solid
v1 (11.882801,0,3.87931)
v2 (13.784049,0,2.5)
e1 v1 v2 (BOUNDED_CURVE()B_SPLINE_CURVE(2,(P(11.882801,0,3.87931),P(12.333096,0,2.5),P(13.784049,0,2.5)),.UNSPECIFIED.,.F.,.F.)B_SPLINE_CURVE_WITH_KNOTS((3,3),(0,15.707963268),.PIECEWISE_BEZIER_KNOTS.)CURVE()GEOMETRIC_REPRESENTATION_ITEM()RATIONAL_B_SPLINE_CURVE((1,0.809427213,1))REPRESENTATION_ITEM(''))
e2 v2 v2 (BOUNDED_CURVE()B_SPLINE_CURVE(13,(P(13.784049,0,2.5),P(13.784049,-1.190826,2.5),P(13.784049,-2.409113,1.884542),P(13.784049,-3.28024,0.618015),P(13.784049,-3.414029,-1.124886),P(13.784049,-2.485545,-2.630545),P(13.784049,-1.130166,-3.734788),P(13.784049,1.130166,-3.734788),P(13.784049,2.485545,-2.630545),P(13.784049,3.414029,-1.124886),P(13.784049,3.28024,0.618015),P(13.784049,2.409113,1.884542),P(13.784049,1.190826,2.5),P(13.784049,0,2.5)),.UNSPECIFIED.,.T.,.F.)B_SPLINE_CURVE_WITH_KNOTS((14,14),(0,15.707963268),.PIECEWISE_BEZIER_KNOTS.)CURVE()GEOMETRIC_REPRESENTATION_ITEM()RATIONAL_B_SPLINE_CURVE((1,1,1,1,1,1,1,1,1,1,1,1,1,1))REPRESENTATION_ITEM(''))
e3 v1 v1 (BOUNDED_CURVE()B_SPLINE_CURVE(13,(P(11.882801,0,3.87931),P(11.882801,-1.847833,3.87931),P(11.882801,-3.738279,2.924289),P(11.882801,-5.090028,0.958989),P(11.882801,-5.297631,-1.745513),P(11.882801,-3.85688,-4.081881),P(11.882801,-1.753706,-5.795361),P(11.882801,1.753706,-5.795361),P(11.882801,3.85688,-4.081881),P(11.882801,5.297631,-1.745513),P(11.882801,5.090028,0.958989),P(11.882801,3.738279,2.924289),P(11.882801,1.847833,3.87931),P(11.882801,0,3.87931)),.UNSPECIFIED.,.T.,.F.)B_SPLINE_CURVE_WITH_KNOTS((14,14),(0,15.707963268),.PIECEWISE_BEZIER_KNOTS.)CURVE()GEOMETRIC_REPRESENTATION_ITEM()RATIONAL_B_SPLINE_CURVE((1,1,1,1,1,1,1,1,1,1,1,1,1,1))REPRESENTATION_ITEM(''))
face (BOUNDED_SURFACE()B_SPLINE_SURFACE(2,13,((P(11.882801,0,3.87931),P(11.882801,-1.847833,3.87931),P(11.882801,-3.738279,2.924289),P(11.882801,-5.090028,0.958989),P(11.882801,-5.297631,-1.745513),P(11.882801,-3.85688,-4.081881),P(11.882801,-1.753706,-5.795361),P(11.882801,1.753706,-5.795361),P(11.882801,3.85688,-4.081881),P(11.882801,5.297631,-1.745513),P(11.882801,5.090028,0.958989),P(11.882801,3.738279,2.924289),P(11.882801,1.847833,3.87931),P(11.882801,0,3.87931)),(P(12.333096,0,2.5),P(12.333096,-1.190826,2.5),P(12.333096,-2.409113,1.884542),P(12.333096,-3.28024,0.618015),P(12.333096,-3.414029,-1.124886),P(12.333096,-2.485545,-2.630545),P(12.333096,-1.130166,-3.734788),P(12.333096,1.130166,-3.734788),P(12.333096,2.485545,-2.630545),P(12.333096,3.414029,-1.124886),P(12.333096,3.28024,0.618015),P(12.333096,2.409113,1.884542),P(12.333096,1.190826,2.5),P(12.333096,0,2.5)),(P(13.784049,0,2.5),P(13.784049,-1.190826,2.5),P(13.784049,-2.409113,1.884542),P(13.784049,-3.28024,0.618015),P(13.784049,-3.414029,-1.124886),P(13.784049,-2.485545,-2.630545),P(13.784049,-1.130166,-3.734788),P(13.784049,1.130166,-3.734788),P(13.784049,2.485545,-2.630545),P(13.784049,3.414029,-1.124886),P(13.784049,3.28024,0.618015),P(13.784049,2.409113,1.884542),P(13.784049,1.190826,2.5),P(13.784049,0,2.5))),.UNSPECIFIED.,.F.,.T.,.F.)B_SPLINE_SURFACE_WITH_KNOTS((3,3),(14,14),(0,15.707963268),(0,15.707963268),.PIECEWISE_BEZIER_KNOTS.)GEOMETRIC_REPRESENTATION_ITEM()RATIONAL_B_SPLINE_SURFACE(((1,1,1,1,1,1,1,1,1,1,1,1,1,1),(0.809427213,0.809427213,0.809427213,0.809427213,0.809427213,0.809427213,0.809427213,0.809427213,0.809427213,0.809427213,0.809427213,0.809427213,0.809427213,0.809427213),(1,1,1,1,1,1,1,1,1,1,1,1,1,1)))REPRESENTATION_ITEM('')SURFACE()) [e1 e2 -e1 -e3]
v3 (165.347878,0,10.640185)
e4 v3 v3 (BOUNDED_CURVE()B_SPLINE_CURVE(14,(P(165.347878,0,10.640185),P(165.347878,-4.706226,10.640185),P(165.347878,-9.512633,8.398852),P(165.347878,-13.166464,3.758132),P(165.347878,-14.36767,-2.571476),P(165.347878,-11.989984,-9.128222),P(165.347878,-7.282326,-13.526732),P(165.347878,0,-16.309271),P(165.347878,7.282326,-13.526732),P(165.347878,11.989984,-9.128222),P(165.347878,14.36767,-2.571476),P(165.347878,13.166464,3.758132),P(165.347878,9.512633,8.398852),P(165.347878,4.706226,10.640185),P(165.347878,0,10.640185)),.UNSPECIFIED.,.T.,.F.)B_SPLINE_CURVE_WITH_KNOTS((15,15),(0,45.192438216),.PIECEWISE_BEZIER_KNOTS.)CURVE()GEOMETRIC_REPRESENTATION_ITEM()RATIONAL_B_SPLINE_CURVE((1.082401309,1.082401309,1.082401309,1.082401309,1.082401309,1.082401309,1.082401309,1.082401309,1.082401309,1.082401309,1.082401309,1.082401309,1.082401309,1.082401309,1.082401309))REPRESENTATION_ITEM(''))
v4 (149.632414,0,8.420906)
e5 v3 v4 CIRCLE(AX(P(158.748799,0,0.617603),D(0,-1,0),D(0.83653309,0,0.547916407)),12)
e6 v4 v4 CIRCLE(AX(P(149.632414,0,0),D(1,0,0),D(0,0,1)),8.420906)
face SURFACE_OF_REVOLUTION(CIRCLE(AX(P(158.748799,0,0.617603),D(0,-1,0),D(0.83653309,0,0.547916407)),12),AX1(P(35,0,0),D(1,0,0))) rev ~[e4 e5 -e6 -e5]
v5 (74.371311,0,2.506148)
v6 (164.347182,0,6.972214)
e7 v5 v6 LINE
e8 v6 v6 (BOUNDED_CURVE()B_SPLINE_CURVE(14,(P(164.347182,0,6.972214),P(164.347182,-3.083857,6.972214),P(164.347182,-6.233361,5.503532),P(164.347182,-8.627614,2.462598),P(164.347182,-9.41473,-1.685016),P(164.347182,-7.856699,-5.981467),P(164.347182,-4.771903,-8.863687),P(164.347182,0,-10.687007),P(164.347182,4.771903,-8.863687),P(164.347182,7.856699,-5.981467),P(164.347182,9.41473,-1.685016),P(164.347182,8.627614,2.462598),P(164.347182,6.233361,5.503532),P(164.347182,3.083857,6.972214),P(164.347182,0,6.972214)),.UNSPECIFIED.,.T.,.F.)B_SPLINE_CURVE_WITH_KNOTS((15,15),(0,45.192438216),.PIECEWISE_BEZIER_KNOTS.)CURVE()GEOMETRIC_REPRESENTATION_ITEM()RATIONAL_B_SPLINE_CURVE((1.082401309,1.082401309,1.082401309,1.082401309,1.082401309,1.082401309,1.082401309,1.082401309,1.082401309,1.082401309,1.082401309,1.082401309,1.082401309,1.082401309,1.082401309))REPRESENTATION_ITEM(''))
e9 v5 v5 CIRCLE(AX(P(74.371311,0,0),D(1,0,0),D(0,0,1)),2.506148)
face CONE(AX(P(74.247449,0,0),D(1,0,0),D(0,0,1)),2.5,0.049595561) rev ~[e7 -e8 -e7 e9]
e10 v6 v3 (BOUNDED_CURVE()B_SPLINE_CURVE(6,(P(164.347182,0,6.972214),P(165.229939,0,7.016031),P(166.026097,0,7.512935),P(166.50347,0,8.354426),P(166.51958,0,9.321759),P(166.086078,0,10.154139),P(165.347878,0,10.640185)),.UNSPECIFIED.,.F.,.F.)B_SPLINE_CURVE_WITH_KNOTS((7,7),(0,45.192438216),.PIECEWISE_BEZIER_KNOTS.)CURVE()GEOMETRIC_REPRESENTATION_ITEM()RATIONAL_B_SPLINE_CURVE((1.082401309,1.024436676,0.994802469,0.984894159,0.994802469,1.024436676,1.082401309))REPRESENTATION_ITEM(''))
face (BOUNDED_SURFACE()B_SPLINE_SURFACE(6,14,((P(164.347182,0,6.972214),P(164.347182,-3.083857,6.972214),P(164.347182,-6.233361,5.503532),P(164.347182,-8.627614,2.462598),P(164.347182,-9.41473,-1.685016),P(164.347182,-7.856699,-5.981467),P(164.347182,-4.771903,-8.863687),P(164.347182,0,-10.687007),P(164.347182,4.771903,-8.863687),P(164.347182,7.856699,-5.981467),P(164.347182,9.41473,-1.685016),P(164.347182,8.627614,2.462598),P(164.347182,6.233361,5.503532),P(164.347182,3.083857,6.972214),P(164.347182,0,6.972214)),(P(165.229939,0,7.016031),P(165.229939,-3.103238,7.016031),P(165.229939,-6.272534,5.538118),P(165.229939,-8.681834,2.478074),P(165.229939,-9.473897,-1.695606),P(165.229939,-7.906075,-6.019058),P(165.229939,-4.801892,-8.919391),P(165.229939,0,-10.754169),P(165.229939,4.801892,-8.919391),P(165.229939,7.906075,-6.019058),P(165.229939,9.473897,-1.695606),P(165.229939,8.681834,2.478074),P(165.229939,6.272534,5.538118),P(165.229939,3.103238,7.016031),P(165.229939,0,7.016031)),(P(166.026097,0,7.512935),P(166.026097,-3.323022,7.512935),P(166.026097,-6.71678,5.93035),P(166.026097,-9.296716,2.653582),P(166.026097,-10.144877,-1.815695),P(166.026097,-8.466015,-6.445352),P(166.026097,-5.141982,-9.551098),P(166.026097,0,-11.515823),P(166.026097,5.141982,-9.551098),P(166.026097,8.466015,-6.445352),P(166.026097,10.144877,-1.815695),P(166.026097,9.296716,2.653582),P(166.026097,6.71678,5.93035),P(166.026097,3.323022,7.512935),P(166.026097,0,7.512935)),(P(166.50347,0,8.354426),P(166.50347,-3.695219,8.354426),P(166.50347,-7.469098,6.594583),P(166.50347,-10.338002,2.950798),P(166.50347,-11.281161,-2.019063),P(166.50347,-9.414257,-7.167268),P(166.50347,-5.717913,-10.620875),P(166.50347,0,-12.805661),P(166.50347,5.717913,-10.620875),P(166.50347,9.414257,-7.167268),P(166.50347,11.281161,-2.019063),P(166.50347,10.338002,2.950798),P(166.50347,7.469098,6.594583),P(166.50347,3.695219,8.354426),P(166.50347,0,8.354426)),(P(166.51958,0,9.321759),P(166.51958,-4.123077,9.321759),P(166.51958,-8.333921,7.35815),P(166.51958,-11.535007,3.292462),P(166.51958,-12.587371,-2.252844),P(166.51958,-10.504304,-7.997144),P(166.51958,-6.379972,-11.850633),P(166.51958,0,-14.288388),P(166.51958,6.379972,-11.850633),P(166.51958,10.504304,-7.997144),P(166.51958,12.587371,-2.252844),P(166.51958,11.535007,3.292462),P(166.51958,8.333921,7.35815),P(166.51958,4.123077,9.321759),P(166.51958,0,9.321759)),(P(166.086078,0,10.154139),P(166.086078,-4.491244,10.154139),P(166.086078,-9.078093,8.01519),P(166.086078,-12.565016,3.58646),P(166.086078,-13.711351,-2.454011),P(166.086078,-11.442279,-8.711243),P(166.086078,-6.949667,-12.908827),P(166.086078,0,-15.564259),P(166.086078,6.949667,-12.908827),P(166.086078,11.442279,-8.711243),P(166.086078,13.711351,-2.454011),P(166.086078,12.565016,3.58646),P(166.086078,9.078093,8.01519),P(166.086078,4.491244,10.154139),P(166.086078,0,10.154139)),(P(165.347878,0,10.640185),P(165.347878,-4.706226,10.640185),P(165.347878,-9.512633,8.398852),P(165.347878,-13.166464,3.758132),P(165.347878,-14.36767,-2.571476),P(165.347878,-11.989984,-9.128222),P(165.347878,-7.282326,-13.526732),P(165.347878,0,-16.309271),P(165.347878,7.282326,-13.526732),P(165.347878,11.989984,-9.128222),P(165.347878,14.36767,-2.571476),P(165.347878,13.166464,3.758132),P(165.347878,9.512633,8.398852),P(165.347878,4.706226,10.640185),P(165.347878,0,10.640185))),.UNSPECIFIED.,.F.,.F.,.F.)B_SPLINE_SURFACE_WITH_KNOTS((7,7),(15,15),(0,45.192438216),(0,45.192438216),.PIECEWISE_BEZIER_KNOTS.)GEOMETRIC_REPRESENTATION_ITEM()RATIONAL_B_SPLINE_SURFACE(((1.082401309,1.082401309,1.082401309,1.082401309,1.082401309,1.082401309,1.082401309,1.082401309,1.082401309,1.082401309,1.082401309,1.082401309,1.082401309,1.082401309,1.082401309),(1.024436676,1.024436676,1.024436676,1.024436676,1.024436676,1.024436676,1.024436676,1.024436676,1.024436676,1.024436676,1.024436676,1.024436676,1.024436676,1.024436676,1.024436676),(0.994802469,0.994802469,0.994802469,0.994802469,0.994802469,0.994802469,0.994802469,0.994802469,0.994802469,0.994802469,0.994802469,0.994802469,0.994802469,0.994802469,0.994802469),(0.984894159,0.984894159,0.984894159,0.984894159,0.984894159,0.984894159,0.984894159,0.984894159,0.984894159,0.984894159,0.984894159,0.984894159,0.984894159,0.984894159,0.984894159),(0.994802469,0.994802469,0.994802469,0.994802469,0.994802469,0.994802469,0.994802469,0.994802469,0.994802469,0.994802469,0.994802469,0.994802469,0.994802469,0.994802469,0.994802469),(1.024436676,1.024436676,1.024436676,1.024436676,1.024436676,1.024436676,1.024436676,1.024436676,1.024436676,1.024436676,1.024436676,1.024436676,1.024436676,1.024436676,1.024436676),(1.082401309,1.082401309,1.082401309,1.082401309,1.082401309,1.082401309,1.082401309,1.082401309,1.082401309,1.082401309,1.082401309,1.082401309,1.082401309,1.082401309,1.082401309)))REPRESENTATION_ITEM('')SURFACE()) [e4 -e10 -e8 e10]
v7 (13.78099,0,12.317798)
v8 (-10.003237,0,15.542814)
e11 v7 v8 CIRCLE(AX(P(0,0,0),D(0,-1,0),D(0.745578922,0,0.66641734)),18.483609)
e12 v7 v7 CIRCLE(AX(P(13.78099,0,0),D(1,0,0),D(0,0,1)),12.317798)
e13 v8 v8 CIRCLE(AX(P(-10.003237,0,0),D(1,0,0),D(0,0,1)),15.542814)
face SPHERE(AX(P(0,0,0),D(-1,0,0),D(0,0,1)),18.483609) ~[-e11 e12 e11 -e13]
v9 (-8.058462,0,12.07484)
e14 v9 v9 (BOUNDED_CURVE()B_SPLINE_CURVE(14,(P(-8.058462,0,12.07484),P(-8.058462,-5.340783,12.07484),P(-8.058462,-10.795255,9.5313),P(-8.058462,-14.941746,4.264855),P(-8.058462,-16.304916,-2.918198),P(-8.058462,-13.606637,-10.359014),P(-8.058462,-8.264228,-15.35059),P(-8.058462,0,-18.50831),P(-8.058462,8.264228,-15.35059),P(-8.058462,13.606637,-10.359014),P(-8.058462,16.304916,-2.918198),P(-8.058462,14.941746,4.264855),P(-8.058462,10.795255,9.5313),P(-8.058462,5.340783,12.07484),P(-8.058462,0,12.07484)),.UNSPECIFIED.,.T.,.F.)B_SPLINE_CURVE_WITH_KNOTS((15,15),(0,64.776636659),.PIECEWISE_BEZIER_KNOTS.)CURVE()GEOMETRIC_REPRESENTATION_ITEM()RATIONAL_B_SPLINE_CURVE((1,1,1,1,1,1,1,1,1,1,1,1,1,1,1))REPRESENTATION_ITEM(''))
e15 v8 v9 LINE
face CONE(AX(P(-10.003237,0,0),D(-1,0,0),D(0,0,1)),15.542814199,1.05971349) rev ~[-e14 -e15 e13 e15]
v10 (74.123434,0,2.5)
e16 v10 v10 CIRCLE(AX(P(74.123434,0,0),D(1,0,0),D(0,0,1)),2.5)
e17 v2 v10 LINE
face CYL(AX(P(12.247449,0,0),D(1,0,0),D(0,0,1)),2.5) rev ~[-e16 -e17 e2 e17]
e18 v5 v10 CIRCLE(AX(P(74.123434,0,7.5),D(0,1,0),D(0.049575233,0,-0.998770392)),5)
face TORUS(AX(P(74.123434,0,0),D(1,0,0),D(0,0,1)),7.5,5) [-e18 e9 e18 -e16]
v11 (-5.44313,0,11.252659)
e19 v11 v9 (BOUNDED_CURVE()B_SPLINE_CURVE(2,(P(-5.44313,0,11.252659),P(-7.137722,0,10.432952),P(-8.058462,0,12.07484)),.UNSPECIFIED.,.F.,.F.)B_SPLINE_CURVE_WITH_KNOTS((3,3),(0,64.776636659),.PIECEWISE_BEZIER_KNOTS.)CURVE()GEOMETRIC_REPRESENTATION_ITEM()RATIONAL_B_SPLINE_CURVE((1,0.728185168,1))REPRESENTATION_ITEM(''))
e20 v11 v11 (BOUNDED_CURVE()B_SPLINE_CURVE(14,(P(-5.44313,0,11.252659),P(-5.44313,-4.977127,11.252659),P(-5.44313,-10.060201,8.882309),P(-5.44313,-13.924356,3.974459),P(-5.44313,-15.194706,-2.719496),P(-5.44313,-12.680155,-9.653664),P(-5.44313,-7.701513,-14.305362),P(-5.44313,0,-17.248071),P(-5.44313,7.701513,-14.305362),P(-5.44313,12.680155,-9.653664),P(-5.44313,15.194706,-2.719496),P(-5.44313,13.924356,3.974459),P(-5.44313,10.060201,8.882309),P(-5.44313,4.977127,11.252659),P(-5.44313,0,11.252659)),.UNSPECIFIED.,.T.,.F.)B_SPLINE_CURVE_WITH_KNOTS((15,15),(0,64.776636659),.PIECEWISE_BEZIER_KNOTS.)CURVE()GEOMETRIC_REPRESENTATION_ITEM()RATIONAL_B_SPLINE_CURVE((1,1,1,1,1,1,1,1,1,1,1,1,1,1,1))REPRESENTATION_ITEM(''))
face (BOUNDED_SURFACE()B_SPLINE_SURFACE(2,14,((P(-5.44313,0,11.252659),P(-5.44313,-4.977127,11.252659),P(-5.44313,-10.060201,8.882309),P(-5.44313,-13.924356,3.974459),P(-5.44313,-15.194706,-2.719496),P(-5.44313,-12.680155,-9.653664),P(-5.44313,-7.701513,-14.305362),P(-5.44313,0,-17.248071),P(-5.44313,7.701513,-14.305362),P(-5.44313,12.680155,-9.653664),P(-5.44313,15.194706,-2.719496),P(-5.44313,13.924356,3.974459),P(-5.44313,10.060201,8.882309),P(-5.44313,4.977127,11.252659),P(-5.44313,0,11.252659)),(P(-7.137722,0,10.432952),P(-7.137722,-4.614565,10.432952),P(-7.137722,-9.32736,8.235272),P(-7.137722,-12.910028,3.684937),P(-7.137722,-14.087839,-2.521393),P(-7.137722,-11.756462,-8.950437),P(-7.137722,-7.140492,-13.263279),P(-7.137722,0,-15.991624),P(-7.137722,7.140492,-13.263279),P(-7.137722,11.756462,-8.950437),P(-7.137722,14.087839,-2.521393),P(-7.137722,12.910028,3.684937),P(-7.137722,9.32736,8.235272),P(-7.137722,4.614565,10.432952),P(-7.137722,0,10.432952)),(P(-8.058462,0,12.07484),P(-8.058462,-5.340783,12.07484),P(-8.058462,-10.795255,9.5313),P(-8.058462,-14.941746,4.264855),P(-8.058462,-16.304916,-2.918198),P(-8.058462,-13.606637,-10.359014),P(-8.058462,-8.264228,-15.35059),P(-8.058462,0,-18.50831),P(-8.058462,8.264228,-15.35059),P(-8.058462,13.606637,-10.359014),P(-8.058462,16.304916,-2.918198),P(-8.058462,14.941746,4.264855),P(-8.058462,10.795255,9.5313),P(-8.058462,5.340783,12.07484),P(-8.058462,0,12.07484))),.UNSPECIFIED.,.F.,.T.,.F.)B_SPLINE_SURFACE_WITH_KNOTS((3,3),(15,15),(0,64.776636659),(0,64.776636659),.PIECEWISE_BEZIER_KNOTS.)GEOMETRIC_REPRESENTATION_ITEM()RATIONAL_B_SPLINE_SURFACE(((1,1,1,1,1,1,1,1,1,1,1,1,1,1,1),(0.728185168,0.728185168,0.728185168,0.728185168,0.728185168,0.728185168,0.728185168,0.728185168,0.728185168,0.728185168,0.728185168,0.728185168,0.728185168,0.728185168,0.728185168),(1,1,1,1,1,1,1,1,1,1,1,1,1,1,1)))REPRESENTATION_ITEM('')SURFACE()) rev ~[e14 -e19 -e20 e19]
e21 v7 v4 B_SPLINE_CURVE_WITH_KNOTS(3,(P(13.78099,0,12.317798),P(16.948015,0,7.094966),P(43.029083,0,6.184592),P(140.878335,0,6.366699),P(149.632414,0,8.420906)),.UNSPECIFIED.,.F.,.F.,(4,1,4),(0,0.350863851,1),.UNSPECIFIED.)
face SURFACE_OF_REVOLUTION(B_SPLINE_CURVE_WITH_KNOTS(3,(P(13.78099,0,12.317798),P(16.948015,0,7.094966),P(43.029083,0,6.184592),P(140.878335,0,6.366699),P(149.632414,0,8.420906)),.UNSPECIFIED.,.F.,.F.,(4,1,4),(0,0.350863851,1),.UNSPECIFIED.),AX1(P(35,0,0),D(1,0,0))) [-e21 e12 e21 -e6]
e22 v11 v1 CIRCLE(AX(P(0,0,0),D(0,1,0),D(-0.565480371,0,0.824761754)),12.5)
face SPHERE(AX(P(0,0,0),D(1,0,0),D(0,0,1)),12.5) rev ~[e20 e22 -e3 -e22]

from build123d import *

# Parameters (mm, degrees)
F2_R = 2


# Not quite as in the source:
# - a fillet or chamfer that OpenCascade refuses, or shapes differently, is made with other operations: its cross-section is extruded or revolved along the edge and cut away or added


with BuildPart() as f1:
    # F0 (on Front) → F1 (revolve)
    with BuildSketch(Plane.XZ):
        with BuildLine():
            ThreePointArc((-7.0685046336, 10.3095219212), (4.6853520259, 11.5886788028), (12.2474487139, 2.5))
            Line((12.2474487139, 2.5), (74.2474487139, 2.5))
            Line((74.2474487139, 2.5), (168.7871957085, 7.1925999325))
            ThreePointArc((168.7871957085, 7.1925999325), (159.5167247738, 12.593006562), (149.6324140859, 8.4209057314))
            add(Edge.make_bspline(
                [(13.7809895682, 12.3177978136), (16.9480145501, 7.0949664659), (43.0290831579, 6.1845923366), (140.8783346117, 6.3666986814), (149.6324140859, 8.4209057314)],
                knots=[0, 0, 0, 0, 0.3508638512, 1, 1, 1, 1], degree=3))
            ThreePointArc((13.7809895682, 12.3177978136), (2.4835532955, 18.3159979112), (-10.003236638, 15.5428141988))
            Line((-10.003236638, 15.5428141988), (-7.0685046336, 10.3095219212))
        make_face()
    revolve(axis=Axis((35, 0, 0), (1, 0, 0)))

    # F2
    f2_edges = [f1.edges().sort_by_distance(p)[0] for p in [
        (168.787196, 0, -7.1926),
        (-7.068505, 0, -10.309522),
        (12.247449, 0, -2.5),
    ]]
    fillet(f2_edges, radius=F2_R)

    # F3: fillet of radius 5 on 1 edges, made by hand

    # F3_s1 → F3_t2 (revolve, cut)
    with BuildSketch(Plane.XZ):
        with BuildLine():
            ThreePointArc((74.371310549, 2.5061480389), (74.2474105858, 2.501537246), (74.1234343898, 2.5))
            Line((74.1234343898, 2.5), (74.1234343898, 2.4))
            Line((74.1234343898, 2.4), (74.2499290004, 2.4))
            Line((74.2499290004, 2.4), (74.3762680722, 2.4062709996))
            Line((74.3762680722, 2.4062709996), (74.371310549, 2.5061480389))
        make_face()
    revolve(axis=Axis((74.2474487139, 0, 0), (1, 0, 0)), mode=Mode.SUBTRACT)


solid = f1.part
